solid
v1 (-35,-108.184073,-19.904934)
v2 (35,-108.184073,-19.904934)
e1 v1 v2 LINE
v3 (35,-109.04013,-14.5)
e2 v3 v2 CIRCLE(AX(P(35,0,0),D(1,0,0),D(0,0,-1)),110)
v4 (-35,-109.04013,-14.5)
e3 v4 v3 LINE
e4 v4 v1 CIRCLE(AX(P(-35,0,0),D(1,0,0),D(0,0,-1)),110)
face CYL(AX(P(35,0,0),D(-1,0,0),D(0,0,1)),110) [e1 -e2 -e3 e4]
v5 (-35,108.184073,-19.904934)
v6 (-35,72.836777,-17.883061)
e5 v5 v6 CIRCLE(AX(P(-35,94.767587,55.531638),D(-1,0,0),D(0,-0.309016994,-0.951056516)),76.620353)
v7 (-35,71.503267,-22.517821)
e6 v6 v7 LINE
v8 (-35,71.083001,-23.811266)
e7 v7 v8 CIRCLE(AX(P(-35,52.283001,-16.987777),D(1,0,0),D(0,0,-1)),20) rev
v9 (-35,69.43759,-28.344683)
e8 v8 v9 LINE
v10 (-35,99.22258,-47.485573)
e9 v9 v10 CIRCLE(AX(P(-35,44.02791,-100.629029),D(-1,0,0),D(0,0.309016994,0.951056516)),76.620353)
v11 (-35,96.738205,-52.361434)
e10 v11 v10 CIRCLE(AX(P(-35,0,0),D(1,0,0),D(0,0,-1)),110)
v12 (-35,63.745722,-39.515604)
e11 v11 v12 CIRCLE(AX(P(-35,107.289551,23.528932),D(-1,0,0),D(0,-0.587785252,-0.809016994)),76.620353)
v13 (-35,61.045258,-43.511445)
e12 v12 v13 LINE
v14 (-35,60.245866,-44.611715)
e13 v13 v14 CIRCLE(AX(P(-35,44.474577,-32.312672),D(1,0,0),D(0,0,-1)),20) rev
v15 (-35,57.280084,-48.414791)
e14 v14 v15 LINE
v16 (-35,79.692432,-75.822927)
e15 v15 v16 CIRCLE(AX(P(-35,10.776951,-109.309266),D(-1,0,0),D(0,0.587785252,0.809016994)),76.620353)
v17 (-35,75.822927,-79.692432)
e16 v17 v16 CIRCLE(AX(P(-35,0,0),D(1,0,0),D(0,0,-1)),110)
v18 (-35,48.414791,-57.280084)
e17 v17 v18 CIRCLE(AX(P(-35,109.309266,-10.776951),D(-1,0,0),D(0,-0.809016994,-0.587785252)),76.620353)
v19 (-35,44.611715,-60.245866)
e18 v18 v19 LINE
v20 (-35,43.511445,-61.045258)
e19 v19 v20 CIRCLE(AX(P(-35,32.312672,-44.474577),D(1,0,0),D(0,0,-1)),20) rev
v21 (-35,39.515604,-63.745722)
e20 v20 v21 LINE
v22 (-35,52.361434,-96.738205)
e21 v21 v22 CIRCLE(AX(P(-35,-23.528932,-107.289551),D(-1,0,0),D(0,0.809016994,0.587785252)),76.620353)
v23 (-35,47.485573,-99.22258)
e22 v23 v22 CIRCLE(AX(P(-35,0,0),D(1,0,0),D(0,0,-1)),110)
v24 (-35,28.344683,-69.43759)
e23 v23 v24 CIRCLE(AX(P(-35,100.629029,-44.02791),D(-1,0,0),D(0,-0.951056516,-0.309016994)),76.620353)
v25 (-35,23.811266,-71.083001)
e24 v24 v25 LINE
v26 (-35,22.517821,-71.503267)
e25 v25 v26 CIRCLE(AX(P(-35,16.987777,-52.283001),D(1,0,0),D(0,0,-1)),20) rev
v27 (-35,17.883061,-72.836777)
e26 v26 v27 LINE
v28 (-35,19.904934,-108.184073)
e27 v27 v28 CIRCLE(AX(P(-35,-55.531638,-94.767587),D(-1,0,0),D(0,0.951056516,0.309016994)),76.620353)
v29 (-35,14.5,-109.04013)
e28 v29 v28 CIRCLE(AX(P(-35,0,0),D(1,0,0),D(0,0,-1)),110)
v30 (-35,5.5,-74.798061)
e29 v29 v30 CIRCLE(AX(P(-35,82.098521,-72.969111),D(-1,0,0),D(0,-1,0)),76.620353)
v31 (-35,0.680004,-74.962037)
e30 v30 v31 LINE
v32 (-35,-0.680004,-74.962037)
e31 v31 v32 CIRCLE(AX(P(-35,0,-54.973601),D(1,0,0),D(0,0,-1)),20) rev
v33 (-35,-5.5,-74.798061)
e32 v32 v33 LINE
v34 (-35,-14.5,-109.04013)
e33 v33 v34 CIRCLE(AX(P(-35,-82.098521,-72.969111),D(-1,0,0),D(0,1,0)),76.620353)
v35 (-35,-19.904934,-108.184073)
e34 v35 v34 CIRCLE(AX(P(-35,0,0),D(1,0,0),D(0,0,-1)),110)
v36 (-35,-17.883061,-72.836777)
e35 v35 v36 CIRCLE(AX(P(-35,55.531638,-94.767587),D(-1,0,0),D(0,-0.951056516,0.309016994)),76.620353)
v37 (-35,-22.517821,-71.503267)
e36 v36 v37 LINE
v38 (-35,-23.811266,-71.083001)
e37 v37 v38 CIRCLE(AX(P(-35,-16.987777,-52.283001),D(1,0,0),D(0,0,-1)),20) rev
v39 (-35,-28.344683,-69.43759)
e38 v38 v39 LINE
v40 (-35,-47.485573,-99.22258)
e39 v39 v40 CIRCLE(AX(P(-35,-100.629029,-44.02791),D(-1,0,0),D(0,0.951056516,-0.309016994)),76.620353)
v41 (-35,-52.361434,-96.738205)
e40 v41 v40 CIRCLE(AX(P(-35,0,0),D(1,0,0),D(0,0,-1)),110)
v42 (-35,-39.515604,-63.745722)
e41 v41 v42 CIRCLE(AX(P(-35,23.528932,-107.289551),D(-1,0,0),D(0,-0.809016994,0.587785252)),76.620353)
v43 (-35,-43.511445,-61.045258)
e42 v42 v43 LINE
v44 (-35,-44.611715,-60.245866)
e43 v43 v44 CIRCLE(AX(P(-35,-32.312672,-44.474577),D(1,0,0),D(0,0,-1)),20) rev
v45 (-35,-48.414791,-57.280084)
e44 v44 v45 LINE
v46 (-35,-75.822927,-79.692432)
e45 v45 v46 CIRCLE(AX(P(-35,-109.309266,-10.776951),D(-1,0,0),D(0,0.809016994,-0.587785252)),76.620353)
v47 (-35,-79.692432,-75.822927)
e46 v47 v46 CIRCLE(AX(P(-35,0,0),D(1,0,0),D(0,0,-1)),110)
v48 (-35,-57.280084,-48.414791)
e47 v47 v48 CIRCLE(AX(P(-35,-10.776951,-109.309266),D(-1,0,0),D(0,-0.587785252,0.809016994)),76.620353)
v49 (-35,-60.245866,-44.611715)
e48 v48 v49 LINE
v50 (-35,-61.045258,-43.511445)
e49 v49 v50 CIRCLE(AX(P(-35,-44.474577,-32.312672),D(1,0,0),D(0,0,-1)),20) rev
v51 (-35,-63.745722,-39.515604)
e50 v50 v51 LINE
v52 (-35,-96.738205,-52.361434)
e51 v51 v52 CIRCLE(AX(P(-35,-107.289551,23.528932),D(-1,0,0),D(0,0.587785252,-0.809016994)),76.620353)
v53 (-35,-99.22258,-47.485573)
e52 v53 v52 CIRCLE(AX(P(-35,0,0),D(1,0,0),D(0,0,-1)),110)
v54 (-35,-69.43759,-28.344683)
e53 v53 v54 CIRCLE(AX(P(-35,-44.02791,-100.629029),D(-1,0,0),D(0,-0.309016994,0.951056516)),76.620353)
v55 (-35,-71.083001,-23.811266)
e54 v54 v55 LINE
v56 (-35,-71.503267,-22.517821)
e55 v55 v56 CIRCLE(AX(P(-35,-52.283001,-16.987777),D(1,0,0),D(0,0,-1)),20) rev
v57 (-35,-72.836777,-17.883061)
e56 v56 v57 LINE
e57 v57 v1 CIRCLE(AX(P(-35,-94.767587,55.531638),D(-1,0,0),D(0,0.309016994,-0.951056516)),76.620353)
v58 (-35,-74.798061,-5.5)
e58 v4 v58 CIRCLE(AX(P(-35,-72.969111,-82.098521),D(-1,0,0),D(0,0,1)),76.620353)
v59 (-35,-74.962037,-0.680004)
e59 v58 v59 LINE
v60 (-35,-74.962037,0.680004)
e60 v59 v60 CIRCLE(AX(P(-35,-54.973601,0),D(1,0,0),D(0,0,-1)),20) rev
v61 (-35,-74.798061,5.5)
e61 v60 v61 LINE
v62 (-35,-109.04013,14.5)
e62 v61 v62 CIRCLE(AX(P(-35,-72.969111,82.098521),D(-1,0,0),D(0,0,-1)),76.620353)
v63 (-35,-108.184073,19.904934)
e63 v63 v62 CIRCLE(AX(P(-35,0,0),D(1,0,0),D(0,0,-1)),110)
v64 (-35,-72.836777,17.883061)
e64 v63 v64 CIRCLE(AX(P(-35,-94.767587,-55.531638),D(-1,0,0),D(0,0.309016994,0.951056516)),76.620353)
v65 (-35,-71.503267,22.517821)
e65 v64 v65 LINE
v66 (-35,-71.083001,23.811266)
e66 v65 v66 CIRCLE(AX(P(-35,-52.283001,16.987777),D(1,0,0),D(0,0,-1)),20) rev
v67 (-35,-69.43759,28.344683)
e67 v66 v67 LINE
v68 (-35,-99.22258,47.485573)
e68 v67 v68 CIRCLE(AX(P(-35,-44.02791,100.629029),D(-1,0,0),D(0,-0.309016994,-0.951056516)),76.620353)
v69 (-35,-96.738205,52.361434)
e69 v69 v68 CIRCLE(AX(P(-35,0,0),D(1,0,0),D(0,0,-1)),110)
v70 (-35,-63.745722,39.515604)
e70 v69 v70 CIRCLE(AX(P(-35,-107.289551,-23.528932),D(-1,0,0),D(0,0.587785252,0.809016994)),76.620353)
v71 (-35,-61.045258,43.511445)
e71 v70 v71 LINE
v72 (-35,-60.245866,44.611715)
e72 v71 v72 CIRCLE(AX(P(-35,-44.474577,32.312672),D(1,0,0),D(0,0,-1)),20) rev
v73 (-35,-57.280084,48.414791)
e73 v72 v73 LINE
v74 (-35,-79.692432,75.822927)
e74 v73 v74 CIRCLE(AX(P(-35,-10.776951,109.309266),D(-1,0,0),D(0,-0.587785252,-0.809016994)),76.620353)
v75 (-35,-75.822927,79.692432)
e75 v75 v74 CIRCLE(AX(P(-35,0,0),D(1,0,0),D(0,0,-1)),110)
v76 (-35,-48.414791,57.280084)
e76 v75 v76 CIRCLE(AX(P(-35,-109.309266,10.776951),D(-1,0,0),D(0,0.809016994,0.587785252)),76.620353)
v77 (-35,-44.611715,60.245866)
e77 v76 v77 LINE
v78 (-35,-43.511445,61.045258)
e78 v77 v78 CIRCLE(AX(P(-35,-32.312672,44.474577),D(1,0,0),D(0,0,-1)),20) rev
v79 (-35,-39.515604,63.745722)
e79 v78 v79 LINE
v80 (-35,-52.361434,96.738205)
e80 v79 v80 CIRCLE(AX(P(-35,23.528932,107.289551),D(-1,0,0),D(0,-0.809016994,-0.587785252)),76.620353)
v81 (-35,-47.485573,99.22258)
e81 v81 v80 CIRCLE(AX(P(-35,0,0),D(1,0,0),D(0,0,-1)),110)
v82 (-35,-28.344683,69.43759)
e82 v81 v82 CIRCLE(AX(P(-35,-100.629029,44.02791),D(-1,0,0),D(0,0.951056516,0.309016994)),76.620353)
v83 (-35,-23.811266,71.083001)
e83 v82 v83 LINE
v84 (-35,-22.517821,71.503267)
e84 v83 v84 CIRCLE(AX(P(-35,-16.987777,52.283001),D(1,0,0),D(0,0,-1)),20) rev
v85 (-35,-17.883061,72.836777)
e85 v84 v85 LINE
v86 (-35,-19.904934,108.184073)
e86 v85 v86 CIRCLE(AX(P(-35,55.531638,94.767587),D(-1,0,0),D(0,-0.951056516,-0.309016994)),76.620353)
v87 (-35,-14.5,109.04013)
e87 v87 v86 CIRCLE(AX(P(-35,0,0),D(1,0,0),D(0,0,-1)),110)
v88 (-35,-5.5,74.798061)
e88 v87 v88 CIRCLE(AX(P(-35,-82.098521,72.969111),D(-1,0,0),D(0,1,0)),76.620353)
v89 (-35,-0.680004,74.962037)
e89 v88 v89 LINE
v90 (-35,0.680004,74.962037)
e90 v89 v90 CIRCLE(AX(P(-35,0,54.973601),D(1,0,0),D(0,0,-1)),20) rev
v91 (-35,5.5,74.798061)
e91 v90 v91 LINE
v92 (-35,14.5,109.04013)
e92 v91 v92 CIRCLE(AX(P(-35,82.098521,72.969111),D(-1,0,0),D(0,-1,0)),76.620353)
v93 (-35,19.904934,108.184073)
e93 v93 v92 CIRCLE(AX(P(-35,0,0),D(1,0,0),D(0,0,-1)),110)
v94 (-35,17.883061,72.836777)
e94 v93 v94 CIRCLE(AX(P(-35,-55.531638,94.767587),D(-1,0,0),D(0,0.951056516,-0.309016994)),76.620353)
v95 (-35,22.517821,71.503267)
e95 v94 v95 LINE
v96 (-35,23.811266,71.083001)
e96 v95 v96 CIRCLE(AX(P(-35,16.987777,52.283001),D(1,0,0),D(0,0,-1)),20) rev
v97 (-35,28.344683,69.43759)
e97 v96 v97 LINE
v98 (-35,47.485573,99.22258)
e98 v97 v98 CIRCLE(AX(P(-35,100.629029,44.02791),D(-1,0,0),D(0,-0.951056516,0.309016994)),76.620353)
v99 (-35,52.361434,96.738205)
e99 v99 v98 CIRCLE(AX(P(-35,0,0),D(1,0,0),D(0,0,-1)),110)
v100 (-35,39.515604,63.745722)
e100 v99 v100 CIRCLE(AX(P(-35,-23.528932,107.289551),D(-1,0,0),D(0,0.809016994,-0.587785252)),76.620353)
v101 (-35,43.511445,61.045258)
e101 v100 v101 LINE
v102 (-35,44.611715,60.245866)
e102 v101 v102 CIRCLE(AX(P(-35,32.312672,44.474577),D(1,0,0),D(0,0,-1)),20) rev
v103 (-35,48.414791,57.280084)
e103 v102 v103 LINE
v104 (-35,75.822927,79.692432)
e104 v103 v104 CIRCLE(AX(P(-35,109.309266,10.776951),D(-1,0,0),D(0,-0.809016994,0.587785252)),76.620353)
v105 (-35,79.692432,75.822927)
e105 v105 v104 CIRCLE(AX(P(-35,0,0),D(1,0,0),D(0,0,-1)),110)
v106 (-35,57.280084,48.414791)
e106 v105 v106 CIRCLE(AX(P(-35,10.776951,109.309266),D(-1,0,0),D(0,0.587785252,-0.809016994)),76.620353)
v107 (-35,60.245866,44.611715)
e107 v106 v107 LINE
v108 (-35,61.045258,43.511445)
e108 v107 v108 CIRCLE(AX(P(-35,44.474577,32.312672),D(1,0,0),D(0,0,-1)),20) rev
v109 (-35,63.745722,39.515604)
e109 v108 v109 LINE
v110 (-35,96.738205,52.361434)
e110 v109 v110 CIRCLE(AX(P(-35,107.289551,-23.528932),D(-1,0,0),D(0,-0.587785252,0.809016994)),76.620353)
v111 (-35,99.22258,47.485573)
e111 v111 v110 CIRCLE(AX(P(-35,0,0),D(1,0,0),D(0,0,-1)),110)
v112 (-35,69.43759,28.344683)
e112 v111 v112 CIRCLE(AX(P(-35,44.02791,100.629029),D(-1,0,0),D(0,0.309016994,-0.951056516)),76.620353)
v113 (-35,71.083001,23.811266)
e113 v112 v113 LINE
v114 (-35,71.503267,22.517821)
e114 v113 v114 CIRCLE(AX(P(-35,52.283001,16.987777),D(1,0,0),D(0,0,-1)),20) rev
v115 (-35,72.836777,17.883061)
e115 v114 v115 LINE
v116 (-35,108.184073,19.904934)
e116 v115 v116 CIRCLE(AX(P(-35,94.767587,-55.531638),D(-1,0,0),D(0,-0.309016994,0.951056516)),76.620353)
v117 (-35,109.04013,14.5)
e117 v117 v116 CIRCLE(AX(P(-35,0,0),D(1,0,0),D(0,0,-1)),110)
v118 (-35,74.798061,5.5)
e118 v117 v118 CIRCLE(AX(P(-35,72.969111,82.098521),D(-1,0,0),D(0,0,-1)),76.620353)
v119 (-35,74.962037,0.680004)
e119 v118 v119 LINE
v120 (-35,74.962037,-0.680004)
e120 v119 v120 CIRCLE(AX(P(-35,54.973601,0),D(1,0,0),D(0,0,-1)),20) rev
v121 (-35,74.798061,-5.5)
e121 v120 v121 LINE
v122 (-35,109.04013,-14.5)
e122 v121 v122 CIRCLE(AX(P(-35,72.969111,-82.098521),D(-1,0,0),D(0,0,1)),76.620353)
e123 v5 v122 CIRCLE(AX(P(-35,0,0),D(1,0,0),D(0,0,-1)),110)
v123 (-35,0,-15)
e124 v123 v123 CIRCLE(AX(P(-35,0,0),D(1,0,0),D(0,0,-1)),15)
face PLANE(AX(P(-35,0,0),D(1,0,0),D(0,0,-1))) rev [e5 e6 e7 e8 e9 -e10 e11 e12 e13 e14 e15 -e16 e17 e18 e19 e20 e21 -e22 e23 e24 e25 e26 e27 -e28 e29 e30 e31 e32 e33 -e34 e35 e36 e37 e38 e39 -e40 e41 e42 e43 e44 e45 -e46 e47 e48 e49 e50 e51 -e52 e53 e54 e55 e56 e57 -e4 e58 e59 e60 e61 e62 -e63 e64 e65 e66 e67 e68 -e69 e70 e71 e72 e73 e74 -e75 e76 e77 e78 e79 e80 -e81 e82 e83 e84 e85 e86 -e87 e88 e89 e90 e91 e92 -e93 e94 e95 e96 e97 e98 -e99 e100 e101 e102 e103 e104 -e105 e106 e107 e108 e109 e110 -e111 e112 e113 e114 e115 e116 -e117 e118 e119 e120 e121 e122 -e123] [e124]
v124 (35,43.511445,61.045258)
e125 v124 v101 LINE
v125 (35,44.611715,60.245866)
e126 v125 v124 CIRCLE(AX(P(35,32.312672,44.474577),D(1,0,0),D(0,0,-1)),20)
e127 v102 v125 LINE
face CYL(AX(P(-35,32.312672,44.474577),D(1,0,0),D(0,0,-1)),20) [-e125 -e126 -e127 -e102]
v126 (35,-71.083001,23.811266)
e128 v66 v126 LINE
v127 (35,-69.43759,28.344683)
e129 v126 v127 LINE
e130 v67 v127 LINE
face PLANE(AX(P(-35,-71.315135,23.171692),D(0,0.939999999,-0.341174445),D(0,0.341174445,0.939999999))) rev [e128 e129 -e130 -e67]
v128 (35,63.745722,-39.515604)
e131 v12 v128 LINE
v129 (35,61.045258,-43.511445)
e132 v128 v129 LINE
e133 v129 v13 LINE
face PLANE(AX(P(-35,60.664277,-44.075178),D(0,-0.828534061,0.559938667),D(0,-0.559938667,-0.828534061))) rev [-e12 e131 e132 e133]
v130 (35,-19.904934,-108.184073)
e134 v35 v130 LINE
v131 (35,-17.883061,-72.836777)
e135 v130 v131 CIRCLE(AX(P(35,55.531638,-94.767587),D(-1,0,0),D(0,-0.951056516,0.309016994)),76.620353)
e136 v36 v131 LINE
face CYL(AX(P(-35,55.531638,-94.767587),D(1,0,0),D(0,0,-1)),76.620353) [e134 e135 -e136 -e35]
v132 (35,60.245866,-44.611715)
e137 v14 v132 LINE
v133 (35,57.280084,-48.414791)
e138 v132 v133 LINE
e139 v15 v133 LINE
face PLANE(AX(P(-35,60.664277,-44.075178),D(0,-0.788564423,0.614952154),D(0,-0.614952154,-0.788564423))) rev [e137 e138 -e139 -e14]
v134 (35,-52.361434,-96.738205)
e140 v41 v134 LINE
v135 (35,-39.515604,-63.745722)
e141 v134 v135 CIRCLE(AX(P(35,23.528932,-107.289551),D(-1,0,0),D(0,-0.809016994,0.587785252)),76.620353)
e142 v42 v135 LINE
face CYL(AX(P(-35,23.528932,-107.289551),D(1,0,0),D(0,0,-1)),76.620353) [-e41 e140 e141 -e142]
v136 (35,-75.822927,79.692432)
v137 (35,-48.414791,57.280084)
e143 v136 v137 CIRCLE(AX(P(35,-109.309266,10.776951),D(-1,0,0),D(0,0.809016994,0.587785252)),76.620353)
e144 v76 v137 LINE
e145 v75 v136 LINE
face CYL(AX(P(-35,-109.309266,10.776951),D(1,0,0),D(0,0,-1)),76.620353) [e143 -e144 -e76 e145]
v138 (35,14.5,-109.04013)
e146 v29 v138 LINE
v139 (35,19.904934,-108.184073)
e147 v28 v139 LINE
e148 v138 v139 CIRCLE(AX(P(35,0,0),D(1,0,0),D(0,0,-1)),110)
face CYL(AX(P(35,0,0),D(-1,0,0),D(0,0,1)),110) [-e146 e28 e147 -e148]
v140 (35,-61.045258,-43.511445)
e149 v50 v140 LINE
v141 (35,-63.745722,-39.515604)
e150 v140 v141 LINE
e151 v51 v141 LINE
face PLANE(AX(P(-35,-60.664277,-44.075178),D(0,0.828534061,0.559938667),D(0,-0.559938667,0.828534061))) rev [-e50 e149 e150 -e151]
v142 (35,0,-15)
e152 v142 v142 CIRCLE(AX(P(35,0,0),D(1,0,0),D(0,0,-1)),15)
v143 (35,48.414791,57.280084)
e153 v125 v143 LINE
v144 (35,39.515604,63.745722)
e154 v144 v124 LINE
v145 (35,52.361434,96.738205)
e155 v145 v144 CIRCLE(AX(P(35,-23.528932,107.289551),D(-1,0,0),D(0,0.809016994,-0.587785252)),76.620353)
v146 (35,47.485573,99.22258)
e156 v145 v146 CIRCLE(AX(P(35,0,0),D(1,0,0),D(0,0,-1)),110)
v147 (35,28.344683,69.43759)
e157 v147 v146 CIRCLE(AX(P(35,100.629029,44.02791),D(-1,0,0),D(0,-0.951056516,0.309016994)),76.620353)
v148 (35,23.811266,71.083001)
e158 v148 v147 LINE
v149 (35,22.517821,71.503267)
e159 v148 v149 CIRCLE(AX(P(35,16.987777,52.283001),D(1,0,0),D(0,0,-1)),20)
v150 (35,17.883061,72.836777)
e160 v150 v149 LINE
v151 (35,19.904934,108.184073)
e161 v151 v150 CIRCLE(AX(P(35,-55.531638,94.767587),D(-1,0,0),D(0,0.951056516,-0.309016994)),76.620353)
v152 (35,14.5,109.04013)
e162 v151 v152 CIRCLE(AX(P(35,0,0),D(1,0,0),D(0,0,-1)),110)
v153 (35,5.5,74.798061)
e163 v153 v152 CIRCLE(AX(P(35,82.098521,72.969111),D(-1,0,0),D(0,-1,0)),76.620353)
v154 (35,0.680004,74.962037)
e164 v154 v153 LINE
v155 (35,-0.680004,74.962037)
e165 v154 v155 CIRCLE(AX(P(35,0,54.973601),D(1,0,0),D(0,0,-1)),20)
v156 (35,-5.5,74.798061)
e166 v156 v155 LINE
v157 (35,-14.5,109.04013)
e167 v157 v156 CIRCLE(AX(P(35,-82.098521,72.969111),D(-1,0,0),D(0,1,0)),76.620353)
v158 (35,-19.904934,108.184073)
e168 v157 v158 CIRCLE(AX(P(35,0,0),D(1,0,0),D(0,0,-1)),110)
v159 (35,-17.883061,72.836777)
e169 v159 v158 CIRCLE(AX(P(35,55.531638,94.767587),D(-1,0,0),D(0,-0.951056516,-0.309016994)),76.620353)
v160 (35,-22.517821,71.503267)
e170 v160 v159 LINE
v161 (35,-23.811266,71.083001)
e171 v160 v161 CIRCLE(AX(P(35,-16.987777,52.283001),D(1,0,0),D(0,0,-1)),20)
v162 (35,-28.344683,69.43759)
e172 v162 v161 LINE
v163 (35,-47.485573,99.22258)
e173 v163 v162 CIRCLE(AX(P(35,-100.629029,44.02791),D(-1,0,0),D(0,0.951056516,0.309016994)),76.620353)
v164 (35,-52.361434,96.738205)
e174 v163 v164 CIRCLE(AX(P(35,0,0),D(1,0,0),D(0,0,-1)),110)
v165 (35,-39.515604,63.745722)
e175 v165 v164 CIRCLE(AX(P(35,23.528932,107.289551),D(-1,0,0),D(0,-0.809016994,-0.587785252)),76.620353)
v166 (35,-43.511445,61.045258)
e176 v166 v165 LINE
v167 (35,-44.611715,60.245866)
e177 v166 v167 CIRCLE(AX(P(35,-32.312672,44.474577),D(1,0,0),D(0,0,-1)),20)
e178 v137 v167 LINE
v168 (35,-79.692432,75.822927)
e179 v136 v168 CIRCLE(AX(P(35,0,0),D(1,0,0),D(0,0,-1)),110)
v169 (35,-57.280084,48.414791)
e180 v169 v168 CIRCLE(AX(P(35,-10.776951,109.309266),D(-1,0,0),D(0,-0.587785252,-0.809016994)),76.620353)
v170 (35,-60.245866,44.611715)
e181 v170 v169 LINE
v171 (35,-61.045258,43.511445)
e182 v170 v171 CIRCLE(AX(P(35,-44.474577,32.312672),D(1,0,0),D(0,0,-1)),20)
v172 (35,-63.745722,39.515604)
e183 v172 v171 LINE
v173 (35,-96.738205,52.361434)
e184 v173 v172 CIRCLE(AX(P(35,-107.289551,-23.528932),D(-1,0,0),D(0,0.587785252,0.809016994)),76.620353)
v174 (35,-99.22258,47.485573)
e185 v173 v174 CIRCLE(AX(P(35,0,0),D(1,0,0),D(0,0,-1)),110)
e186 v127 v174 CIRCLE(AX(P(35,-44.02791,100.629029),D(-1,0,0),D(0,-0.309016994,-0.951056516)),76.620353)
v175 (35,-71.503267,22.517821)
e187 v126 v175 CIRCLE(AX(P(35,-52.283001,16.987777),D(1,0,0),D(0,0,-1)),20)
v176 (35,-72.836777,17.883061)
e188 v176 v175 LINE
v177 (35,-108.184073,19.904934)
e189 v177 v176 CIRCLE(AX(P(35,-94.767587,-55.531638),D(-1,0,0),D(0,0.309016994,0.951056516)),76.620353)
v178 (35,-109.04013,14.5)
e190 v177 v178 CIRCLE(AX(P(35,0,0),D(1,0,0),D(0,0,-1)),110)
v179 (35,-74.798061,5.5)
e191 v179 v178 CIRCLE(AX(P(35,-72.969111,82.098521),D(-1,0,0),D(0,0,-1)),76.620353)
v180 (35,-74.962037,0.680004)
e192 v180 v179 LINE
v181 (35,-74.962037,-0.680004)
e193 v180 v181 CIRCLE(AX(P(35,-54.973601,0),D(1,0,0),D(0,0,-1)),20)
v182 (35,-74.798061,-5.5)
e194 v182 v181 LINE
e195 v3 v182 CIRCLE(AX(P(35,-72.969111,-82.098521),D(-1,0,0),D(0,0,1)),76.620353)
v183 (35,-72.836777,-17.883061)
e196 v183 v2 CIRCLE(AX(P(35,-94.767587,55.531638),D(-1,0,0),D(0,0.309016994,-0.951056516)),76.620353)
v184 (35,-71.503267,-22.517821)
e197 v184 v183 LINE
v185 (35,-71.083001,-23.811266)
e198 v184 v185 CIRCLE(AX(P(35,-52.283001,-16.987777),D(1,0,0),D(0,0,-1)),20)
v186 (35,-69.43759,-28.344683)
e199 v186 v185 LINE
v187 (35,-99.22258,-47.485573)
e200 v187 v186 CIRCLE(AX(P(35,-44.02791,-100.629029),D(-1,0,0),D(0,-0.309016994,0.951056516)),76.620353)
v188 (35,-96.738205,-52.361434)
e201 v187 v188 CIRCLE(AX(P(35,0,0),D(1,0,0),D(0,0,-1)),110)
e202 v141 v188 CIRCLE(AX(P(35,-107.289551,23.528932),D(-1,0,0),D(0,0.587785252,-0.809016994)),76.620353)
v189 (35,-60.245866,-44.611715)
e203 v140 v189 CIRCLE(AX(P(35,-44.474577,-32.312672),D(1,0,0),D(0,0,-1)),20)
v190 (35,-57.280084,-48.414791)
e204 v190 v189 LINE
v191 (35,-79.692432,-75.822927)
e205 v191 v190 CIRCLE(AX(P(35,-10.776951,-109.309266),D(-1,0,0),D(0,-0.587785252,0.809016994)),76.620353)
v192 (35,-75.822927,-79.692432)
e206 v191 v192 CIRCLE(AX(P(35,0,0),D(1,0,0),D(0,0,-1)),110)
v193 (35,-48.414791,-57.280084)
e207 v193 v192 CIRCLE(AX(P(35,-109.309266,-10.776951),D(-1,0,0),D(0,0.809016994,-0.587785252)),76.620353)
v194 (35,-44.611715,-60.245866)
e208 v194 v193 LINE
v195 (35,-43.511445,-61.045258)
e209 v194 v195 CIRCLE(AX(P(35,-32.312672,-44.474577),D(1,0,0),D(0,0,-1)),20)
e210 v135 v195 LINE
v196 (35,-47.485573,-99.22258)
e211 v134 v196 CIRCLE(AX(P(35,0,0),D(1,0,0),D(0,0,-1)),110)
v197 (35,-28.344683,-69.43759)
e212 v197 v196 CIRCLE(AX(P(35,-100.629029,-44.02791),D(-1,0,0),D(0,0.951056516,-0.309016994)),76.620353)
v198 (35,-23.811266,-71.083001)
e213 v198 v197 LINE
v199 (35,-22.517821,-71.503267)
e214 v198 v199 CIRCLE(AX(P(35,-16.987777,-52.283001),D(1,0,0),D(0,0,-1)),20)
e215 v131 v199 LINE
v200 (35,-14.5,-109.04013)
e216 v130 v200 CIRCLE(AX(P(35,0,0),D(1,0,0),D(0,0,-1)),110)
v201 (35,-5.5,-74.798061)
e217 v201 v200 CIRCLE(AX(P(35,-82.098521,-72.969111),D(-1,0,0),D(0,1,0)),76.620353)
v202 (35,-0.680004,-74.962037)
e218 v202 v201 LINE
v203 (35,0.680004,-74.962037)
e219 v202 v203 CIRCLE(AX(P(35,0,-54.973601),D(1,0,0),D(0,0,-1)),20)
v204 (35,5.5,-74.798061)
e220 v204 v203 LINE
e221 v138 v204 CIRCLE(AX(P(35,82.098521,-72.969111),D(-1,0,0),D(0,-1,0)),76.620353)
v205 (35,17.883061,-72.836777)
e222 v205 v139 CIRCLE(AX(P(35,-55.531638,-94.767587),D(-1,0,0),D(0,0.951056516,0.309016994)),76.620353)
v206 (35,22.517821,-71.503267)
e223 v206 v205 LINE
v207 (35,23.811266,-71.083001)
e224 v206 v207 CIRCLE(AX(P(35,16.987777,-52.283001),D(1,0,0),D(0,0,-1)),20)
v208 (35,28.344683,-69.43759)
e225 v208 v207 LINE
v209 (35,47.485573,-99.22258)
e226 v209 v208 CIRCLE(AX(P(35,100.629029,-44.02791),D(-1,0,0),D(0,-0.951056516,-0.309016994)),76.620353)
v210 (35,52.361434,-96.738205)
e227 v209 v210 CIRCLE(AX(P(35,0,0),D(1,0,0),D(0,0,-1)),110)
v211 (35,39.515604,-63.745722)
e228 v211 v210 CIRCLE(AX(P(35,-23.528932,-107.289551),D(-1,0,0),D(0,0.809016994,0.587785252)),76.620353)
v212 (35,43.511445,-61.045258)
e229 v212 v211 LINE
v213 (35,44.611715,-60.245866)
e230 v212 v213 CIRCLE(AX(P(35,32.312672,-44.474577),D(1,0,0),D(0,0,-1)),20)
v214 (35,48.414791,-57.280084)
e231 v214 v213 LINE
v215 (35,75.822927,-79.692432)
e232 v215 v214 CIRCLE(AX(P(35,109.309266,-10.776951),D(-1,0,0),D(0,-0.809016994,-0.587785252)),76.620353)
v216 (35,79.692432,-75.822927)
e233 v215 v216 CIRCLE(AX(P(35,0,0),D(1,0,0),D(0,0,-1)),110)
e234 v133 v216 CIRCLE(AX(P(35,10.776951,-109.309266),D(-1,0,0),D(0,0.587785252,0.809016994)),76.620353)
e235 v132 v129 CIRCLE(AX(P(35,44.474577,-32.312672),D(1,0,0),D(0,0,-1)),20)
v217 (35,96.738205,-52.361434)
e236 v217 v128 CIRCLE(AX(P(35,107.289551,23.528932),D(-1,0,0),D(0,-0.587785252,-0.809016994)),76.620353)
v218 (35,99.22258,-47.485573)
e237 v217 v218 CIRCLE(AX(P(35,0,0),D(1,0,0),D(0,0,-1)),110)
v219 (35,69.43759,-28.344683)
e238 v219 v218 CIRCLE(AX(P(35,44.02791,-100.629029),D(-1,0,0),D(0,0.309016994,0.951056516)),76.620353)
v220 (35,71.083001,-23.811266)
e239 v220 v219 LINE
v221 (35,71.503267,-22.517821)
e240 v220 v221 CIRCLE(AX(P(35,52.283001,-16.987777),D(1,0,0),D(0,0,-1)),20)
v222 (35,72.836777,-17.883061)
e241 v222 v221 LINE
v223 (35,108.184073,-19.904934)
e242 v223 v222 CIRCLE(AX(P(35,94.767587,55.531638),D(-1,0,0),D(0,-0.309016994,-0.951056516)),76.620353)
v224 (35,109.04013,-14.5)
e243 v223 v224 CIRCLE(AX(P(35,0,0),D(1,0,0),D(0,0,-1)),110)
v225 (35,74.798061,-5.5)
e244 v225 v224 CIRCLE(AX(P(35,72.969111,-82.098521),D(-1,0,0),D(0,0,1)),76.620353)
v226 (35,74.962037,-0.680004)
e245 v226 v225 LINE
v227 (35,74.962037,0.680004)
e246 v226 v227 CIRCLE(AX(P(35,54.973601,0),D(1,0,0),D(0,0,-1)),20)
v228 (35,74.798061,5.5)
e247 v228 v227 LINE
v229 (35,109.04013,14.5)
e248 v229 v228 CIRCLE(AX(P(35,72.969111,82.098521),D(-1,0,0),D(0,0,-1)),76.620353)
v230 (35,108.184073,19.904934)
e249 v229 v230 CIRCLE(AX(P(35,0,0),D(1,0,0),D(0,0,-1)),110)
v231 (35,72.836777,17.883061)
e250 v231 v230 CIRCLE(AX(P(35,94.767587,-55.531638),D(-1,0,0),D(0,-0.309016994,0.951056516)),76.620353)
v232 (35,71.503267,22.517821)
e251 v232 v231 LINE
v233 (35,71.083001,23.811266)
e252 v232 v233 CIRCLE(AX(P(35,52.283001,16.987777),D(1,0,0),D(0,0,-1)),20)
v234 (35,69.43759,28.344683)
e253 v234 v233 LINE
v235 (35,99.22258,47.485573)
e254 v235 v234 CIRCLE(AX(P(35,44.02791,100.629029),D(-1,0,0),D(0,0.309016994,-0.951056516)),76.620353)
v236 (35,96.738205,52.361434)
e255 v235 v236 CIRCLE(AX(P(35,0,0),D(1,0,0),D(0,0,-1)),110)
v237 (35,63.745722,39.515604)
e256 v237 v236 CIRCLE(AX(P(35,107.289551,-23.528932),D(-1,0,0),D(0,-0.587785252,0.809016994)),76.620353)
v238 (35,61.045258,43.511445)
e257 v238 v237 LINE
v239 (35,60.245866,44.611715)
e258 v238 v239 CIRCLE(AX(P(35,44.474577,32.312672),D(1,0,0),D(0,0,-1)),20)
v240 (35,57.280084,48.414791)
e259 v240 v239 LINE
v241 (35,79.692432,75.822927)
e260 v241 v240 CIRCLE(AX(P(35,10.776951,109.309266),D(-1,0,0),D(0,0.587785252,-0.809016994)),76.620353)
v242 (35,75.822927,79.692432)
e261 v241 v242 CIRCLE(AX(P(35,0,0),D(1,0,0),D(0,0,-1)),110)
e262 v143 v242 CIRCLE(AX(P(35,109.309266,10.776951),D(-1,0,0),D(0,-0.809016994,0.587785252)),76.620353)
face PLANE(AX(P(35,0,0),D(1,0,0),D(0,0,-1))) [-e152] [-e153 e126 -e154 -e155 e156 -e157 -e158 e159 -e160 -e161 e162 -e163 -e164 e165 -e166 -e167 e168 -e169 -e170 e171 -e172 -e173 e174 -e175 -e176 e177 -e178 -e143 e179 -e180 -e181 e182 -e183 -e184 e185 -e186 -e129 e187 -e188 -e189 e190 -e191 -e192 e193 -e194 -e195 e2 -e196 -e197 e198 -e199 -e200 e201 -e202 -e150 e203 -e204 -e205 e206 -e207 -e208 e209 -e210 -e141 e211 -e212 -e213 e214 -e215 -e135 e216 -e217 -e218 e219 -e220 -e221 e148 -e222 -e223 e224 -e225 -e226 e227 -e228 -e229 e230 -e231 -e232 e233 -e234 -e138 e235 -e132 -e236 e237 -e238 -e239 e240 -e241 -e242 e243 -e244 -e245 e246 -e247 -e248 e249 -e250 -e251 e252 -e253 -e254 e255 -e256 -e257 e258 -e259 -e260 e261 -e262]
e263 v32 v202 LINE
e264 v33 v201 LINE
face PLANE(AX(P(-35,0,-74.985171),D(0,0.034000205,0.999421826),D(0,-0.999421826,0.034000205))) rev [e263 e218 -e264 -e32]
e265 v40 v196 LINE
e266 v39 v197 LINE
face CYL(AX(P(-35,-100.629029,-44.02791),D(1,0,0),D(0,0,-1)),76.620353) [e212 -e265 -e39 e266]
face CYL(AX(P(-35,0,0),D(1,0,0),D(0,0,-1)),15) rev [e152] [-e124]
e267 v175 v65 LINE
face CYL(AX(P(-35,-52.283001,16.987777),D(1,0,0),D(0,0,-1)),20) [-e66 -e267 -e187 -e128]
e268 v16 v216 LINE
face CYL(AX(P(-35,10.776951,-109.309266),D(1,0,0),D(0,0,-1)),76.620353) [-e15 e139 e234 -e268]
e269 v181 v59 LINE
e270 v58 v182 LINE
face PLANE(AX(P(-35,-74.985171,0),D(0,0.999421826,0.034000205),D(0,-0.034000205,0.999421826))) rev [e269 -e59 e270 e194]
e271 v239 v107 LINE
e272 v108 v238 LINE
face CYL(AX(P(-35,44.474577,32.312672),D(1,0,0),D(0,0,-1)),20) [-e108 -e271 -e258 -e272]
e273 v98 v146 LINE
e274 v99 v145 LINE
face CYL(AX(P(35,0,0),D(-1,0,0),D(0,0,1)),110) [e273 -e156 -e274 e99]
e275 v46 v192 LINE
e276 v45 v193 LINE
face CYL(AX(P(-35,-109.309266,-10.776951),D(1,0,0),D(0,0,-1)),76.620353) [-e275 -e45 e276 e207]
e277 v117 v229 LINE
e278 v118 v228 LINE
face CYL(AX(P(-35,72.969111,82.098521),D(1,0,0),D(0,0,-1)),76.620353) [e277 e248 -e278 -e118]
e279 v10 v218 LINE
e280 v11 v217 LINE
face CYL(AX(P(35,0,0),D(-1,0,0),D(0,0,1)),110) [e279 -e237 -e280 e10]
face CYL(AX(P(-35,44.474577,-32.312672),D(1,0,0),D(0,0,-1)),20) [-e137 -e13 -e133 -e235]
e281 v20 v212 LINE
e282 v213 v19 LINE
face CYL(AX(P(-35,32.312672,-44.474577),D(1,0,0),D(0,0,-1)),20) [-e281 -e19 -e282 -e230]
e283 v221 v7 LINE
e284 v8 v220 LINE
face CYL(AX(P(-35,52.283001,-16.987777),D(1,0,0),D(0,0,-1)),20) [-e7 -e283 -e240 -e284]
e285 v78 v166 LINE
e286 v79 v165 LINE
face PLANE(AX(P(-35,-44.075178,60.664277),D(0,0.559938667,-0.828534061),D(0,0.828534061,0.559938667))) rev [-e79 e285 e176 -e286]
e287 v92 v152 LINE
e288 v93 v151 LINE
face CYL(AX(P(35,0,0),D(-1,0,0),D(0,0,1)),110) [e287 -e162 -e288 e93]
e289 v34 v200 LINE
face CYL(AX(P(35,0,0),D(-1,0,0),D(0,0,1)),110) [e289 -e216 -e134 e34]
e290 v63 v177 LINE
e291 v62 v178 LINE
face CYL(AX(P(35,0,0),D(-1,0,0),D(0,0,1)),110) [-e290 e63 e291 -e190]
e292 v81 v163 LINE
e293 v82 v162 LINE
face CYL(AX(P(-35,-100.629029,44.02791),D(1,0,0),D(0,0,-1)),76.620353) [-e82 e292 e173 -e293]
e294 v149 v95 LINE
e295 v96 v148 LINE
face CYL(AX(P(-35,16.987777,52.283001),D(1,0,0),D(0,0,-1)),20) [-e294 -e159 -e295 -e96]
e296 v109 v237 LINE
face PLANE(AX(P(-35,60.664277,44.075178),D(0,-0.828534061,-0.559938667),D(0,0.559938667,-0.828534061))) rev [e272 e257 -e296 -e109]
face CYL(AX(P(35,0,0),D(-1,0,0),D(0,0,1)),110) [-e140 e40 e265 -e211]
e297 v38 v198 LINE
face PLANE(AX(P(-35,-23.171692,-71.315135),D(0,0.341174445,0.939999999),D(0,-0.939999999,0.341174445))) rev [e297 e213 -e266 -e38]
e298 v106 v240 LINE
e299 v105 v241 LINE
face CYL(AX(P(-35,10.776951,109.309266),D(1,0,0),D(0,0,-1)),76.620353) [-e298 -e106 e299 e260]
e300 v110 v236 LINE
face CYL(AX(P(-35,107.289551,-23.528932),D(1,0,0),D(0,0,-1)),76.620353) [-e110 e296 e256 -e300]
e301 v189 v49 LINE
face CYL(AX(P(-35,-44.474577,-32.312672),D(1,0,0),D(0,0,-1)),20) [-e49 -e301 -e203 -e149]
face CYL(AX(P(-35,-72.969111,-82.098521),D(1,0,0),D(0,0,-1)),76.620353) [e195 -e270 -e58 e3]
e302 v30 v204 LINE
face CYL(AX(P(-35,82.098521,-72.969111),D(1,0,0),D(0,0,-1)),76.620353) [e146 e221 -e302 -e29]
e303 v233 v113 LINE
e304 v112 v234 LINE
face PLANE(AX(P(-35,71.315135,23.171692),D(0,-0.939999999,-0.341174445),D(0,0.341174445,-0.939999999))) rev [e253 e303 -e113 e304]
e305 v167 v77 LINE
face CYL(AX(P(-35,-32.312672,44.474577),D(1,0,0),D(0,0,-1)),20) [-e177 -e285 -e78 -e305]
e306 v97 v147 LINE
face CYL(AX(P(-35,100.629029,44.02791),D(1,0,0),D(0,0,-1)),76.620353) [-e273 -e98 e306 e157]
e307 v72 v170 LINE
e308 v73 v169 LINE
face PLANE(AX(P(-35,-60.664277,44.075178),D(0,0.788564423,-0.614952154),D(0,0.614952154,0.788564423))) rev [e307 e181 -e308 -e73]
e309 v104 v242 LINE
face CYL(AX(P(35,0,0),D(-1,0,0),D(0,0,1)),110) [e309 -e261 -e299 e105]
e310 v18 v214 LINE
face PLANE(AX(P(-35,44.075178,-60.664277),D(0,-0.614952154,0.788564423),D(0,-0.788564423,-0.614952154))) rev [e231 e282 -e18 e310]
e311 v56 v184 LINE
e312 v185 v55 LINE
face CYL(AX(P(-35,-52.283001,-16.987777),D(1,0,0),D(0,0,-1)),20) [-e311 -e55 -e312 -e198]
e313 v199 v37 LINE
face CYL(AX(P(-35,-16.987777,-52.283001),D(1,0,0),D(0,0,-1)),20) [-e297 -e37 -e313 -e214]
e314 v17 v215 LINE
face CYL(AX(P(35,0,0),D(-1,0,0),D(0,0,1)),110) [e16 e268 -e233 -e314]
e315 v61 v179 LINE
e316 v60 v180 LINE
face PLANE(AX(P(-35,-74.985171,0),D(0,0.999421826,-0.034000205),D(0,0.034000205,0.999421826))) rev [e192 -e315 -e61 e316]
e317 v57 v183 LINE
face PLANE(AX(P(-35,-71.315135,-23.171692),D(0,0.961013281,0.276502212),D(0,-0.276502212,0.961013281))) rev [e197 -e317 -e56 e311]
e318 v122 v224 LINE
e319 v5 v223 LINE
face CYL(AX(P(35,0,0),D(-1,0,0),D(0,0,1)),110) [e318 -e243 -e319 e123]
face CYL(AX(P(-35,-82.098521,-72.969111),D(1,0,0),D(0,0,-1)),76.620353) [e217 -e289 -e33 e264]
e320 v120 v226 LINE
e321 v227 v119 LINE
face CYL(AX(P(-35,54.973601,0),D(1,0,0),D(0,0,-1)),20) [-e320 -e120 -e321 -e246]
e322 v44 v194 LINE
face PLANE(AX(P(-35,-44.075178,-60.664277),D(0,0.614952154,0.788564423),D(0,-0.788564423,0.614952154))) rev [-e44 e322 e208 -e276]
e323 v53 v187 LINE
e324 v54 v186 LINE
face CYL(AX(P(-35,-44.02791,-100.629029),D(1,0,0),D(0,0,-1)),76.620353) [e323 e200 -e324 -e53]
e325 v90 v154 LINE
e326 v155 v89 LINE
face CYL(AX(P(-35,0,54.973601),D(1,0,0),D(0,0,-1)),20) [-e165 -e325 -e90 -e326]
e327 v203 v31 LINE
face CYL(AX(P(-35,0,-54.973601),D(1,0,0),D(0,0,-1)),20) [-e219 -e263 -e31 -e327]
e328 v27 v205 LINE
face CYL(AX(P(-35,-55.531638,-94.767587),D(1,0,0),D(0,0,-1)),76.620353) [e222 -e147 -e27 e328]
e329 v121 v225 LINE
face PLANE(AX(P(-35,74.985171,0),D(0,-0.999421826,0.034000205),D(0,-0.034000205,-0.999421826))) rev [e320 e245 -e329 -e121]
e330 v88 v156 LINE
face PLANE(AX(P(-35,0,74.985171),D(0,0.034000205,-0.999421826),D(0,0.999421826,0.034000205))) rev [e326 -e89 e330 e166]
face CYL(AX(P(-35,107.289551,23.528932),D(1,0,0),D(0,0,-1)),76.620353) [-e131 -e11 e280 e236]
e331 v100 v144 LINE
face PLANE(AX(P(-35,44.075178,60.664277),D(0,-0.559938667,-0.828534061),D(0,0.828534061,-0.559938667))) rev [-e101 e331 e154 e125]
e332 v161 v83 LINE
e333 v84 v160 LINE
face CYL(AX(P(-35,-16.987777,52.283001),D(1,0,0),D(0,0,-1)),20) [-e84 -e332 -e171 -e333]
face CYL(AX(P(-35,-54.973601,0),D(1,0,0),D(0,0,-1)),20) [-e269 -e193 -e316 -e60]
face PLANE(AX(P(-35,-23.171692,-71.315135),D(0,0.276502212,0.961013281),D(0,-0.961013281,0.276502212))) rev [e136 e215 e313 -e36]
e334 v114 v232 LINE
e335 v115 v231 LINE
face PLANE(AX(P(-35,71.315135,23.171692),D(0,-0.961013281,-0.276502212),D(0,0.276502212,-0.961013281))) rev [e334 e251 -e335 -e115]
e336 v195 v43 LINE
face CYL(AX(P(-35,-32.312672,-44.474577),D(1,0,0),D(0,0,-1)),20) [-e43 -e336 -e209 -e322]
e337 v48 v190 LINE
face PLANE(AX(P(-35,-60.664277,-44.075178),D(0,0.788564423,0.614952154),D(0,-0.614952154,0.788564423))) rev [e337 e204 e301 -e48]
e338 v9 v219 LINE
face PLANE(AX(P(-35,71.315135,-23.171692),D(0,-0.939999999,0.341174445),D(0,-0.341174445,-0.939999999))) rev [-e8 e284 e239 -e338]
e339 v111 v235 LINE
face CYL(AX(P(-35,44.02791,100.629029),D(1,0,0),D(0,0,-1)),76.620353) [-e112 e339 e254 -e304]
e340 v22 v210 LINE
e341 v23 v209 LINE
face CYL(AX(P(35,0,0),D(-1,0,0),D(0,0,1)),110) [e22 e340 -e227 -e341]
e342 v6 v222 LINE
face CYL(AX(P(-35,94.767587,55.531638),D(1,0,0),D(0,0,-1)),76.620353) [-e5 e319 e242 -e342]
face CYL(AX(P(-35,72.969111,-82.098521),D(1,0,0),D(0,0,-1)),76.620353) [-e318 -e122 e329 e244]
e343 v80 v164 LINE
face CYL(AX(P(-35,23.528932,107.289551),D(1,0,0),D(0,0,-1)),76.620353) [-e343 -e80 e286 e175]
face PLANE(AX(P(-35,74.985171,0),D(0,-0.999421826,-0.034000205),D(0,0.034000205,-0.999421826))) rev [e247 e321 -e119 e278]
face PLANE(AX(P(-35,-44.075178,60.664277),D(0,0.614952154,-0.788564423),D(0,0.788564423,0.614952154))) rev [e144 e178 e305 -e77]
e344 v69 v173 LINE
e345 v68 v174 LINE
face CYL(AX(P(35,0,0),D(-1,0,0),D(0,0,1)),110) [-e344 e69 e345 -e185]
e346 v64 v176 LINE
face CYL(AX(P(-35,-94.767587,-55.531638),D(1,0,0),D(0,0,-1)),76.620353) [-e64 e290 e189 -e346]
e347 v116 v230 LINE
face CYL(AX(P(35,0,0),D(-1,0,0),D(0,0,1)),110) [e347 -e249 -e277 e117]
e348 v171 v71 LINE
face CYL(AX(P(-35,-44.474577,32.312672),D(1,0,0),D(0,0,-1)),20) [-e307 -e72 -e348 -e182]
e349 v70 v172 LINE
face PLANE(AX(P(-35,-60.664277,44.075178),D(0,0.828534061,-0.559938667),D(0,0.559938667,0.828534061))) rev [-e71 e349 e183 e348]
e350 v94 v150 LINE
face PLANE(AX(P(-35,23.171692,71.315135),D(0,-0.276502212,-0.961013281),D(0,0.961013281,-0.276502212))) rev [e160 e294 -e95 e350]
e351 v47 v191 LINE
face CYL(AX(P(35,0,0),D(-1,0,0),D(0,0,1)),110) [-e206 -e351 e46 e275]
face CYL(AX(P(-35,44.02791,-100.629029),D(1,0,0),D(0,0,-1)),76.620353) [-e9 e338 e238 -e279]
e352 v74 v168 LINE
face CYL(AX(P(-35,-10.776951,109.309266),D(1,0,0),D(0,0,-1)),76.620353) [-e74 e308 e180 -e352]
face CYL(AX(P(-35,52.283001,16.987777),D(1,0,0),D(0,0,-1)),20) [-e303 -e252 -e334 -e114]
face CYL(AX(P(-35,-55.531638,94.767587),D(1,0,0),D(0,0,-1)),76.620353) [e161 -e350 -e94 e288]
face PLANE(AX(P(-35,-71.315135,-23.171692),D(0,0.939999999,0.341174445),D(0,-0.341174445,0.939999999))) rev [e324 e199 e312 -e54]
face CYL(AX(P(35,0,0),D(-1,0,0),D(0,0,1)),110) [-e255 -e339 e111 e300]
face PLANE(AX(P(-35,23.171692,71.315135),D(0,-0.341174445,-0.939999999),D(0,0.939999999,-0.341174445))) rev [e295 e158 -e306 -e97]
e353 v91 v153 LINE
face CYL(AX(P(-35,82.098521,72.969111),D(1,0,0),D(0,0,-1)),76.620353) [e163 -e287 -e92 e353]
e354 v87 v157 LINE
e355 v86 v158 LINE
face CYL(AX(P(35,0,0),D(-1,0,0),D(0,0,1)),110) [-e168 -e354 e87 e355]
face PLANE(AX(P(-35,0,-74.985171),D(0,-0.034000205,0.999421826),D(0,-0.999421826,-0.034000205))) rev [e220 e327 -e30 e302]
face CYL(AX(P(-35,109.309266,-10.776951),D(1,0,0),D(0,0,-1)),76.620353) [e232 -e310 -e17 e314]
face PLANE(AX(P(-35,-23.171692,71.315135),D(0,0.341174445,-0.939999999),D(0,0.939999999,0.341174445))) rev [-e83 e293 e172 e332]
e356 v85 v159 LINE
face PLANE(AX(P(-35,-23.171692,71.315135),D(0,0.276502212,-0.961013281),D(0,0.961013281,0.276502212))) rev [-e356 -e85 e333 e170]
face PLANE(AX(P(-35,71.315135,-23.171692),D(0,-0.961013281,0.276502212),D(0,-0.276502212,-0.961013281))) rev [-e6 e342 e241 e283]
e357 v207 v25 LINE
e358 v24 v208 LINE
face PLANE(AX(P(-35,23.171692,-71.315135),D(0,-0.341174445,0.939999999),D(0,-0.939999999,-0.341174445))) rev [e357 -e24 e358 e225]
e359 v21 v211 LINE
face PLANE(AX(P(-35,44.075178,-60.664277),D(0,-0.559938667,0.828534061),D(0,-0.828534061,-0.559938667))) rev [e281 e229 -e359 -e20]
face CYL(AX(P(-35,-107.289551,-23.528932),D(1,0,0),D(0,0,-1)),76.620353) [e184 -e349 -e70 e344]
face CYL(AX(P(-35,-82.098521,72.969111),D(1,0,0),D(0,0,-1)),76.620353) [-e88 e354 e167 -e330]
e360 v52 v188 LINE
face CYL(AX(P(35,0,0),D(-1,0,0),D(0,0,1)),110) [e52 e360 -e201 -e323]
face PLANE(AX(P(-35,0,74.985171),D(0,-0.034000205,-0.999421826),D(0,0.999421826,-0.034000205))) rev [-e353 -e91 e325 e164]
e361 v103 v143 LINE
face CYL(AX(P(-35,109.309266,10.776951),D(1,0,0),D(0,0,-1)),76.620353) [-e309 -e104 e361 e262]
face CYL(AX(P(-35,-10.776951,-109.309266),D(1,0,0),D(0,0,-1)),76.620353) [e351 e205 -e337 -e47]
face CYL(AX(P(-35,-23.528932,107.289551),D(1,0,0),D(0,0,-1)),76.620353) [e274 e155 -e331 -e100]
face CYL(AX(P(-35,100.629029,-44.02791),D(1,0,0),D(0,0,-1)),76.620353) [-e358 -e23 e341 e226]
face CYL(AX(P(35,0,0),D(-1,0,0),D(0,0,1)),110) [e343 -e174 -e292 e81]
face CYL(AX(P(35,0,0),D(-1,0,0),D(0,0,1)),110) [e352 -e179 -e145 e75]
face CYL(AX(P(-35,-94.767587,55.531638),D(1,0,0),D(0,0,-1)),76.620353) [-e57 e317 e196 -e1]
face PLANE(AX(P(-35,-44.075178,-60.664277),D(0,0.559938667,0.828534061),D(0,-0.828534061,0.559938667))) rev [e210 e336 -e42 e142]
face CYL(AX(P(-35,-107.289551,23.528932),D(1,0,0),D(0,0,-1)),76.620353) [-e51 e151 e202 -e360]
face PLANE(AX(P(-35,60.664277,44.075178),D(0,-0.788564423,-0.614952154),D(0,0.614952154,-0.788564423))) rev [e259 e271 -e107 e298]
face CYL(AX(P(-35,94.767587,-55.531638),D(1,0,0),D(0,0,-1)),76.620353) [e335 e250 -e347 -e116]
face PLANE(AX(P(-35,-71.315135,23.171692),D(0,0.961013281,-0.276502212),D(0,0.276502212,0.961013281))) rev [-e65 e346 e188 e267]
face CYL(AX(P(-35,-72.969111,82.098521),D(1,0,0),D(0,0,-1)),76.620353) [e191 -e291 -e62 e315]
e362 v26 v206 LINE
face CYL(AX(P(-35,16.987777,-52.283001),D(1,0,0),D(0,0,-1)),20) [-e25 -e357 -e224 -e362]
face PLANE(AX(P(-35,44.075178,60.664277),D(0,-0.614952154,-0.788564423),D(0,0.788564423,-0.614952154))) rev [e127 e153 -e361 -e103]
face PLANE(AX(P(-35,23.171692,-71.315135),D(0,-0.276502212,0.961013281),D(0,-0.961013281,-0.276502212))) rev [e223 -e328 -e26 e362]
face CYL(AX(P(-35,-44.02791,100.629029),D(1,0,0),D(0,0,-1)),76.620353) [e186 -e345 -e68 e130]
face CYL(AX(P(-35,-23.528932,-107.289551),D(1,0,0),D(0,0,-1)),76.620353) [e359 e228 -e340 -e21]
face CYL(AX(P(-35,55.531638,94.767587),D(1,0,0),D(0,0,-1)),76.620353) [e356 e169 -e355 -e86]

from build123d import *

# Parameters (mm, degrees)
SKETCH1_R                = 110
BOSS_EXTRUDE1_DEPTH      = 35
SKETCH6_R                = 15
CUT_EXTRUDE4_DEPTH       = 171.587221092
CUT_EXTRUDE5_DEPTH       = 171.587221092
FILLET1_R                = 20
CIRPATTERN3_COUNT        = 20
FILLET1_OF_CIRPATTERN3_R = 20


with BuildPart() as part:
    # Sketch1 → Boss-Extrude1 (new, symmetric)
    with BuildSketch(Plane(origin=(0, 0, 0), x_dir=(0, 0, -1), z_dir=(1, 0, 0))):
        Circle(SKETCH1_R)
    extrude(amount=BOSS_EXTRUDE1_DEPTH, both=True)

    # Sketch6 → Cut-Extrude4 (cut, through all)
    with BuildSketch(Plane(origin=(35, 0, 0), x_dir=(0, 0, -1), z_dir=(1, 0, 0))):
        Circle(SKETCH6_R)
    extrude(amount=-CUT_EXTRUDE4_DEPTH, mode=Mode.SUBTRACT)

    # Sketch7 → Cut-Extrude5 (cut, through all)
    with BuildSketch(Plane(origin=(35, 0, 0), x_dir=(0, 0, -1), z_dir=(1, 0, 0))):
        with BuildLine():
            Line((0, 74.98517078), (-5.5, 74.798061472))
            ThreePointArc((-5.5, 74.798061472), (-7.995035607, 92.446069838), (-14.5, 109.040130227))
            Line((-14.5, 109.040130227), (0, 147))
            Line((0, 147), (14.5, 109.040130227))
            ThreePointArc((14.5, 109.040130227), (7.995035607, 92.446069838), (5.5, 74.798061472))
            Line((5.5, 74.798061472), (0, 74.98517078))
        make_face()
    cut_extrude5 = extrude(amount=-CUT_EXTRUDE5_DEPTH, mode=Mode.SUBTRACT)

    # Fillet1
    # the kernel refuses this fillet: 20 mm, written as the material it takes off along each edge
    with BuildSketch(Plane(origin=(36.700993707, 74.98517078, 0), x_dir=(0, -0.034000204734020274, -0.9994218258963753), z_dir=(-1, 0, 0))) as fillet1_piece_1:
        with BuildLine():
            CenterArc((FILLET1_R * 0.0340198741443, FILLET1_R), FILLET1_R, 266.103112477, 3.896887523)
            Line((-FILLET1_R * 0.033941219248, FILLET1_R * 0.00231202784391), (0, 0))
            Line((0, 0), (FILLET1_R * 0.0340198741443, 0))
        make_face()
    extrude(amount=73.401987414, mode=Mode.SUBTRACT)

    # CirPattern3: Cut-Extrude5 ×20 about axis
    cirpattern3_axis = Axis((0, 0, 0), (1, 0, 0))
    for i in range(1, CIRPATTERN3_COUNT):
        add(cut_extrude5.rotate(cirpattern3_axis, i * 360 / CIRPATTERN3_COUNT), mode=Mode.SUBTRACT)

    # Fillet1 of CirPattern3
    # the kernel refuses this fillet: 20 mm, written as the material it takes off along each edge
    with BuildSketch(Plane(origin=(36.700993707, 71.315135296, 23.171692097), x_dir=(0, -0.3411744450188669, 0.9399999989713128), z_dir=(-1, 0, 0)), Plane(origin=(36.700993707, 60.664277487, 44.075177525), x_dir=(0, -0.6149521535231338, 0.7885644227818424), z_dir=(-1, 0, 0)), Plane(origin=(36.700993707, 44.075177525, 60.664277487), x_dir=(0, -0.8285340606169823, 0.5599386666390654), z_dir=(-1, 0, 0)), Plane(origin=(36.700993707, 23.171692097, 71.315135296), x_dir=(0, -0.9610132811213845, 0.2765022124835726), z_dir=(-1, 0, 0)), Plane(origin=(36.700993707, 0, 74.98517078), x_dir=(0, -0.9994218258963753, -0.03400020473402028), z_dir=(-1, 0, 0)), Plane(origin=(36.700993707, -23.171692097, 71.315135296), x_dir=(0, -0.9399999989713128, -0.3411744450188669), z_dir=(-1, 0, 0)), Plane(origin=(36.700993707, -44.075177525, 60.664277487), x_dir=(0, -0.7885644227818294, -0.6149521535231504), z_dir=(-1, 0, 0)), Plane(origin=(36.700993707, -60.664277487, 44.075177525), x_dir=(0, -0.5599386666390632, -0.8285340606169839), z_dir=(-1, 0, 0)), Plane(origin=(36.700993707, -71.315135296, 23.171692097), x_dir=(0, -0.2765022124835726, -0.9610132811213845), z_dir=(-1, 0, 0)), Plane(origin=(36.700993707, -74.98517078, 0), x_dir=(0, 0.0340002047340203, -0.9994218258963753), z_dir=(-1, 0, 0)), Plane(origin=(36.700993707, -71.315135296, -23.171692097), x_dir=(0, 0.34117444501886857, -0.9399999989713121), z_dir=(-1, 0, 0)), Plane(origin=(36.700993707, -60.664277487, -44.075177525), x_dir=(0, 0.6149521535231454, -0.7885644227818334), z_dir=(-1, 0, 0)), Plane(origin=(36.700993707, -44.075177525, -60.664277487), x_dir=(0, 0.8285340606169823, -0.5599386666390654), z_dir=(-1, 0, 0)), Plane(origin=(36.700993707, -23.171692097, -71.315135296), x_dir=(0, 0.9610132811213842, -0.276502212483574), z_dir=(-1, 0, 0)), Plane(origin=(36.700993707, 0, -74.98517078), x_dir=(0, 0.9994218258963753, 0.034000204734020295), z_dir=(-1, 0, 0)), Plane(origin=(36.700993707, 23.171692097, -71.315135296), x_dir=(0, 0.939999998971314, 0.34117444501886357), z_dir=(-1, 0, 0)), Plane(origin=(36.700993707, 44.075177525, -60.664277487), x_dir=(0, 0.7885644227818333, 0.6149521535231453), z_dir=(-1, 0, 0)), Plane(origin=(36.700993707, 60.664277487, -44.075177525), x_dir=(0, 0.559938666639056, 0.8285340606169888), z_dir=(-1, 0, 0)), Plane(origin=(36.700993707, 71.315135296, -23.171692097), x_dir=(0, 0.2765022124835726, 0.9610132811213845), z_dir=(-1, 0, 0))) as fillet1_of_cirpattern3_piece_1:
        with BuildLine():
            CenterArc((FILLET1_OF_CIRPATTERN3_R * 0.0340198741442, -FILLET1_OF_CIRPATTERN3_R), FILLET1_OF_CIRPATTERN3_R, 90, 3.896887523)
            Line((-FILLET1_OF_CIRPATTERN3_R * 0.033941219248, -FILLET1_OF_CIRPATTERN3_R * 0.00231202784391), (0, 0))
            Line((0, 0), (FILLET1_OF_CIRPATTERN3_R * 0.0340198741443, 0))
        make_face()
    extrude(amount=73.401987414, mode=Mode.SUBTRACT)


solid = part.part
